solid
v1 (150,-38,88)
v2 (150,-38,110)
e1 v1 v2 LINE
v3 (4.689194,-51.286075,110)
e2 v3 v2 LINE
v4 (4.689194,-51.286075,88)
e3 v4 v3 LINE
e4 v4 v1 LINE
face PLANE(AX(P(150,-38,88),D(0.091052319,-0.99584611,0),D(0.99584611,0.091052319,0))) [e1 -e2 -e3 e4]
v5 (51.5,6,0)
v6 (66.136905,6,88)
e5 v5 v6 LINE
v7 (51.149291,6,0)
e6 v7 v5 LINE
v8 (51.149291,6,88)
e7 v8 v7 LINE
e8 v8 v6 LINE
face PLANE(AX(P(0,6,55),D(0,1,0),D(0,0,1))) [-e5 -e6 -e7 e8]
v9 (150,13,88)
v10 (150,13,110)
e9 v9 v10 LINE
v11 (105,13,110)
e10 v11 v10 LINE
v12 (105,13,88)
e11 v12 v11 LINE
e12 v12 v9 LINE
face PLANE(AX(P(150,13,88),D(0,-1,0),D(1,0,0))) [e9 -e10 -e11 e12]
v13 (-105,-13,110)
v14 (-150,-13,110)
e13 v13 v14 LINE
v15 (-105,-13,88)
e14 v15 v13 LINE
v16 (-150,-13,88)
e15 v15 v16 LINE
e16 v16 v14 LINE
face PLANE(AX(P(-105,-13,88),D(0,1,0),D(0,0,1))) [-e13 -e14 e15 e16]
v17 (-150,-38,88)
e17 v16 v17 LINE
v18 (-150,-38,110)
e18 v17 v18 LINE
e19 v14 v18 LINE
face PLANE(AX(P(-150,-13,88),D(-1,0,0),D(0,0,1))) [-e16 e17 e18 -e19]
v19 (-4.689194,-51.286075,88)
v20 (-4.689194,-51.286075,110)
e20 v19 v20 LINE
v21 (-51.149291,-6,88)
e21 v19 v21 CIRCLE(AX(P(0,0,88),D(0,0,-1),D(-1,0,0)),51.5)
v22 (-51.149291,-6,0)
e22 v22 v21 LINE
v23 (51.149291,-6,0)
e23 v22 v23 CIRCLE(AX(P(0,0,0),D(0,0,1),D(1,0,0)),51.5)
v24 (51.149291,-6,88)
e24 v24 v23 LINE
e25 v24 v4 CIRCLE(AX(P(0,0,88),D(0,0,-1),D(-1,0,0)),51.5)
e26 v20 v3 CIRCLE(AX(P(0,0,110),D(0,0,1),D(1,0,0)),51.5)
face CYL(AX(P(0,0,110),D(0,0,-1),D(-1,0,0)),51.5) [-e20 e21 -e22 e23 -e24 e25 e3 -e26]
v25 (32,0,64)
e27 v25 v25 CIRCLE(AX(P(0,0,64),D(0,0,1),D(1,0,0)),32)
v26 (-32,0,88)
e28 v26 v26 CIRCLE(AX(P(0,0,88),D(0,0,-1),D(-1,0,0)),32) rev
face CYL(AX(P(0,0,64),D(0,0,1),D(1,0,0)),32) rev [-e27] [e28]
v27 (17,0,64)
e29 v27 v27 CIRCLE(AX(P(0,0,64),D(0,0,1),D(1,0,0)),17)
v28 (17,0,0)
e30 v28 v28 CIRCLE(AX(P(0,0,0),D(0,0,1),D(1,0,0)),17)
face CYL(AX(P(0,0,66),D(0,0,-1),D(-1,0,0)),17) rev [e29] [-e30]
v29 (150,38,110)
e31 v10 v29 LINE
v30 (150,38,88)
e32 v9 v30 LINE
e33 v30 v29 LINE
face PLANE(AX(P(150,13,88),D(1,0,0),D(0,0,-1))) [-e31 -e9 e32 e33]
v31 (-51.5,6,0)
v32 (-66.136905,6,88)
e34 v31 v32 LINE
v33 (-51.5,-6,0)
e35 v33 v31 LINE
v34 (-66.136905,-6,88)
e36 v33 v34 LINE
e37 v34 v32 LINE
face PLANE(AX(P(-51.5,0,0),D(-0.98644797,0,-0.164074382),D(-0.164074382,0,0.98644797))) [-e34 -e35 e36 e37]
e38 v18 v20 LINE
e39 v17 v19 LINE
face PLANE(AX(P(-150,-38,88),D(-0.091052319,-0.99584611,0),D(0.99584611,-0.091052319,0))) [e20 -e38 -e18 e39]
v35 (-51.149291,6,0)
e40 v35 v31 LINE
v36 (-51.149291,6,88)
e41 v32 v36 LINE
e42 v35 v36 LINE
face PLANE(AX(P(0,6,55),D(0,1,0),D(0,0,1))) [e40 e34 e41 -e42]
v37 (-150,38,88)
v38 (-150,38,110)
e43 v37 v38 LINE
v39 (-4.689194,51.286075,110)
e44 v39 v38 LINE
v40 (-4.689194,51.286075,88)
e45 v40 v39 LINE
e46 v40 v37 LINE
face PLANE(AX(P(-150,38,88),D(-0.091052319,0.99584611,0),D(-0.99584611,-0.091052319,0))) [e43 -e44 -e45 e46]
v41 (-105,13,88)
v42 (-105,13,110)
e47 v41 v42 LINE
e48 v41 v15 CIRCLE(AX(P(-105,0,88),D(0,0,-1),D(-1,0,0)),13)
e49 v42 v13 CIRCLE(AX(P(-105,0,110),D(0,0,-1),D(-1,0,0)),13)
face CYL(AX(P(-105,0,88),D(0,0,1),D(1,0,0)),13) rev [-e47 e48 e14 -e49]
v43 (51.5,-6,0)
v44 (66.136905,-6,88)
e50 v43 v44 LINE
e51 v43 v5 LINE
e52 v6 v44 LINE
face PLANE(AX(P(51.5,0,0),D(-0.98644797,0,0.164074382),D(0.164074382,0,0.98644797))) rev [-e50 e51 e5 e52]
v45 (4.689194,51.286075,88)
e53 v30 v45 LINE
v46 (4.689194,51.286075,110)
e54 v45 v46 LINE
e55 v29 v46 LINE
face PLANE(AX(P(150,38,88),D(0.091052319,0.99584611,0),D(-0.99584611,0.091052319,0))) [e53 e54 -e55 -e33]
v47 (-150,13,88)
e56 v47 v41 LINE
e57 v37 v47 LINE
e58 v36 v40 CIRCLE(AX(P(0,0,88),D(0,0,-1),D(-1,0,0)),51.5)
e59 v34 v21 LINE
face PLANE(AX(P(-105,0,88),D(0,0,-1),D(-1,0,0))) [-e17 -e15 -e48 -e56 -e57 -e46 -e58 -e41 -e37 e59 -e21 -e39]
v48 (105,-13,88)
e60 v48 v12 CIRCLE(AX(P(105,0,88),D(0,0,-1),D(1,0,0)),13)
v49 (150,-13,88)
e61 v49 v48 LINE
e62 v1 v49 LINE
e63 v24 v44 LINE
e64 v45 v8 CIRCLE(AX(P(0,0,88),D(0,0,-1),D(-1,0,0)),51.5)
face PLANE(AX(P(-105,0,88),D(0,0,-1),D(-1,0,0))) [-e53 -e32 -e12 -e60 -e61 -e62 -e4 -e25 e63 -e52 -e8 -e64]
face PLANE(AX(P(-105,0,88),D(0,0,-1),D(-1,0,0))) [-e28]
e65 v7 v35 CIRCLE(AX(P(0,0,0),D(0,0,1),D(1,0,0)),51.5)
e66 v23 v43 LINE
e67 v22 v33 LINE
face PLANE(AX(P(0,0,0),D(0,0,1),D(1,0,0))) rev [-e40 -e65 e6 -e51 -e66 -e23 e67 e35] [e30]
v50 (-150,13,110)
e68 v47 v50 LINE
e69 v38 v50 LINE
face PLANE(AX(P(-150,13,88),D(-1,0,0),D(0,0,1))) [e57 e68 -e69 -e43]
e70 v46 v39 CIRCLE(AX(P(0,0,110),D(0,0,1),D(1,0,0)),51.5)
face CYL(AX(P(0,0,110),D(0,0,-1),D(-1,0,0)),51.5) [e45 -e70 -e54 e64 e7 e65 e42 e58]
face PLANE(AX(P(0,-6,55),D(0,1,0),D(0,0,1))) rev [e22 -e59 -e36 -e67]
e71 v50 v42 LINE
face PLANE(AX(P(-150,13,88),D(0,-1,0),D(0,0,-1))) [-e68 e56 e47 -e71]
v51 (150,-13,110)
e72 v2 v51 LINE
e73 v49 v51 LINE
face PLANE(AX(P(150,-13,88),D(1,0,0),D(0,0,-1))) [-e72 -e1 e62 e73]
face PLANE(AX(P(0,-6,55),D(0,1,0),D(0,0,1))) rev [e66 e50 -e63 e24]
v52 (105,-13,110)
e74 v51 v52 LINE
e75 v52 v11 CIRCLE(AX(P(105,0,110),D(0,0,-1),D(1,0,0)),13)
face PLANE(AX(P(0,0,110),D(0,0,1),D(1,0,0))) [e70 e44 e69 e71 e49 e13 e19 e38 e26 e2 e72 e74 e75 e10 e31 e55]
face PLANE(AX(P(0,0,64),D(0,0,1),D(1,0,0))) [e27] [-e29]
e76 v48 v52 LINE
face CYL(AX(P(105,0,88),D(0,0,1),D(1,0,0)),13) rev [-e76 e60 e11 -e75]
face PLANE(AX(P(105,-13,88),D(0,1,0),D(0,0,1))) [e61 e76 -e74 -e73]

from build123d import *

# Parameters (mm, degrees)
SZKIC5_R                    = 51.5
DODANIE_WYCI_GNI_CIE5_DEPTH = 110
SZKIC6_R                    = 17
WYTNIJ_WYCI_GNI_CIE3_DEPTH  = 66
SZKIC8_R                    = 32
WYTNIJ_WYCI_GNI_CIE4_DEPTH  = 46
DODANIE_WYCI_GNI_CIE7_DEPTH = 22
EBRO3_START                 = -6
EBRO3_DEPTH                 = 12


# Read off the part's stored shape, not the designer's step: Żebro3
with BuildPart() as part:
    # Szkic5 → Dodanie-wyciągnięcie5 (new body)
    with BuildSketch(Plane.XY):
        Circle(SZKIC5_R)
    extrude(amount=DODANIE_WYCI_GNI_CIE5_DEPTH)

    # Szkic6 → Wytnij-wyciągnięcie3 (cut)
    with BuildSketch(Plane.XY):
        Circle(SZKIC6_R)
    extrude(amount=WYTNIJ_WYCI_GNI_CIE3_DEPTH, mode=Mode.SUBTRACT)

    # Szkic8 → Wytnij-wyciągnięcie4 (cut)
    with BuildSketch(Plane.XY.offset(110)):
        Circle(SZKIC8_R)
    extrude(amount=-WYTNIJ_WYCI_GNI_CIE4_DEPTH, mode=Mode.SUBTRACT)

    # Szkic9 → Dodanie-wyciągnięcie7 (add)
    with BuildSketch(Plane.XY.offset(110)):
        with BuildLine():
            Line((-150, 13), (-150, 38))
            Line((-150, 38), (-4.689194415, 51.286074677))
            Line((-4.689194415, 51.286074677), (4.689194415, 51.286074677))
            Line((4.689194415, 51.286074677), (150, 38))
            Line((150, 38), (150, 13))
            Line((150, 13), (105, 13))
            ThreePointArc((105, 13), (92, 0), (105, -13))
            Line((105, -13), (150, -13))
            Line((150, -13), (150, -38))
            Line((150, -38), (4.689194415, -51.286074677))
            Line((4.689194415, -51.286074677), (-4.689194415, -51.286074677))
            Line((-4.689194415, -51.286074677), (-150, -38))
            Line((-150, -38), (-150, -13))
            Line((-150, -13), (-105, -13))
            ThreePointArc((-105, -13), (-92, 0), (-105, 13))
            Line((-105, 13), (-150, 13))
        make_face()
    extrude(amount=-DODANIE_WYCI_GNI_CIE7_DEPTH)

    # Żebro3 outline → Żebro3 (add)
    with BuildSketch(Plane(origin=(0, 0, 0), x_dir=(1, 0, 0), z_dir=(0, 1, 0)).offset(EBRO3_START)):
        Polygon((66.136905435, -88), (51.5, 0), (51, 0), (51, -89), (66.303233906, -89), align=None)
    ebro3 = extrude(amount=EBRO3_DEPTH)

    # Lustro2: Żebro3 across plane
    add(ebro3.mirror(Plane(origin=(0, 0, 0), x_dir=(0, 0, 1), z_dir=(1, 0, 0))))


solid = part.part
